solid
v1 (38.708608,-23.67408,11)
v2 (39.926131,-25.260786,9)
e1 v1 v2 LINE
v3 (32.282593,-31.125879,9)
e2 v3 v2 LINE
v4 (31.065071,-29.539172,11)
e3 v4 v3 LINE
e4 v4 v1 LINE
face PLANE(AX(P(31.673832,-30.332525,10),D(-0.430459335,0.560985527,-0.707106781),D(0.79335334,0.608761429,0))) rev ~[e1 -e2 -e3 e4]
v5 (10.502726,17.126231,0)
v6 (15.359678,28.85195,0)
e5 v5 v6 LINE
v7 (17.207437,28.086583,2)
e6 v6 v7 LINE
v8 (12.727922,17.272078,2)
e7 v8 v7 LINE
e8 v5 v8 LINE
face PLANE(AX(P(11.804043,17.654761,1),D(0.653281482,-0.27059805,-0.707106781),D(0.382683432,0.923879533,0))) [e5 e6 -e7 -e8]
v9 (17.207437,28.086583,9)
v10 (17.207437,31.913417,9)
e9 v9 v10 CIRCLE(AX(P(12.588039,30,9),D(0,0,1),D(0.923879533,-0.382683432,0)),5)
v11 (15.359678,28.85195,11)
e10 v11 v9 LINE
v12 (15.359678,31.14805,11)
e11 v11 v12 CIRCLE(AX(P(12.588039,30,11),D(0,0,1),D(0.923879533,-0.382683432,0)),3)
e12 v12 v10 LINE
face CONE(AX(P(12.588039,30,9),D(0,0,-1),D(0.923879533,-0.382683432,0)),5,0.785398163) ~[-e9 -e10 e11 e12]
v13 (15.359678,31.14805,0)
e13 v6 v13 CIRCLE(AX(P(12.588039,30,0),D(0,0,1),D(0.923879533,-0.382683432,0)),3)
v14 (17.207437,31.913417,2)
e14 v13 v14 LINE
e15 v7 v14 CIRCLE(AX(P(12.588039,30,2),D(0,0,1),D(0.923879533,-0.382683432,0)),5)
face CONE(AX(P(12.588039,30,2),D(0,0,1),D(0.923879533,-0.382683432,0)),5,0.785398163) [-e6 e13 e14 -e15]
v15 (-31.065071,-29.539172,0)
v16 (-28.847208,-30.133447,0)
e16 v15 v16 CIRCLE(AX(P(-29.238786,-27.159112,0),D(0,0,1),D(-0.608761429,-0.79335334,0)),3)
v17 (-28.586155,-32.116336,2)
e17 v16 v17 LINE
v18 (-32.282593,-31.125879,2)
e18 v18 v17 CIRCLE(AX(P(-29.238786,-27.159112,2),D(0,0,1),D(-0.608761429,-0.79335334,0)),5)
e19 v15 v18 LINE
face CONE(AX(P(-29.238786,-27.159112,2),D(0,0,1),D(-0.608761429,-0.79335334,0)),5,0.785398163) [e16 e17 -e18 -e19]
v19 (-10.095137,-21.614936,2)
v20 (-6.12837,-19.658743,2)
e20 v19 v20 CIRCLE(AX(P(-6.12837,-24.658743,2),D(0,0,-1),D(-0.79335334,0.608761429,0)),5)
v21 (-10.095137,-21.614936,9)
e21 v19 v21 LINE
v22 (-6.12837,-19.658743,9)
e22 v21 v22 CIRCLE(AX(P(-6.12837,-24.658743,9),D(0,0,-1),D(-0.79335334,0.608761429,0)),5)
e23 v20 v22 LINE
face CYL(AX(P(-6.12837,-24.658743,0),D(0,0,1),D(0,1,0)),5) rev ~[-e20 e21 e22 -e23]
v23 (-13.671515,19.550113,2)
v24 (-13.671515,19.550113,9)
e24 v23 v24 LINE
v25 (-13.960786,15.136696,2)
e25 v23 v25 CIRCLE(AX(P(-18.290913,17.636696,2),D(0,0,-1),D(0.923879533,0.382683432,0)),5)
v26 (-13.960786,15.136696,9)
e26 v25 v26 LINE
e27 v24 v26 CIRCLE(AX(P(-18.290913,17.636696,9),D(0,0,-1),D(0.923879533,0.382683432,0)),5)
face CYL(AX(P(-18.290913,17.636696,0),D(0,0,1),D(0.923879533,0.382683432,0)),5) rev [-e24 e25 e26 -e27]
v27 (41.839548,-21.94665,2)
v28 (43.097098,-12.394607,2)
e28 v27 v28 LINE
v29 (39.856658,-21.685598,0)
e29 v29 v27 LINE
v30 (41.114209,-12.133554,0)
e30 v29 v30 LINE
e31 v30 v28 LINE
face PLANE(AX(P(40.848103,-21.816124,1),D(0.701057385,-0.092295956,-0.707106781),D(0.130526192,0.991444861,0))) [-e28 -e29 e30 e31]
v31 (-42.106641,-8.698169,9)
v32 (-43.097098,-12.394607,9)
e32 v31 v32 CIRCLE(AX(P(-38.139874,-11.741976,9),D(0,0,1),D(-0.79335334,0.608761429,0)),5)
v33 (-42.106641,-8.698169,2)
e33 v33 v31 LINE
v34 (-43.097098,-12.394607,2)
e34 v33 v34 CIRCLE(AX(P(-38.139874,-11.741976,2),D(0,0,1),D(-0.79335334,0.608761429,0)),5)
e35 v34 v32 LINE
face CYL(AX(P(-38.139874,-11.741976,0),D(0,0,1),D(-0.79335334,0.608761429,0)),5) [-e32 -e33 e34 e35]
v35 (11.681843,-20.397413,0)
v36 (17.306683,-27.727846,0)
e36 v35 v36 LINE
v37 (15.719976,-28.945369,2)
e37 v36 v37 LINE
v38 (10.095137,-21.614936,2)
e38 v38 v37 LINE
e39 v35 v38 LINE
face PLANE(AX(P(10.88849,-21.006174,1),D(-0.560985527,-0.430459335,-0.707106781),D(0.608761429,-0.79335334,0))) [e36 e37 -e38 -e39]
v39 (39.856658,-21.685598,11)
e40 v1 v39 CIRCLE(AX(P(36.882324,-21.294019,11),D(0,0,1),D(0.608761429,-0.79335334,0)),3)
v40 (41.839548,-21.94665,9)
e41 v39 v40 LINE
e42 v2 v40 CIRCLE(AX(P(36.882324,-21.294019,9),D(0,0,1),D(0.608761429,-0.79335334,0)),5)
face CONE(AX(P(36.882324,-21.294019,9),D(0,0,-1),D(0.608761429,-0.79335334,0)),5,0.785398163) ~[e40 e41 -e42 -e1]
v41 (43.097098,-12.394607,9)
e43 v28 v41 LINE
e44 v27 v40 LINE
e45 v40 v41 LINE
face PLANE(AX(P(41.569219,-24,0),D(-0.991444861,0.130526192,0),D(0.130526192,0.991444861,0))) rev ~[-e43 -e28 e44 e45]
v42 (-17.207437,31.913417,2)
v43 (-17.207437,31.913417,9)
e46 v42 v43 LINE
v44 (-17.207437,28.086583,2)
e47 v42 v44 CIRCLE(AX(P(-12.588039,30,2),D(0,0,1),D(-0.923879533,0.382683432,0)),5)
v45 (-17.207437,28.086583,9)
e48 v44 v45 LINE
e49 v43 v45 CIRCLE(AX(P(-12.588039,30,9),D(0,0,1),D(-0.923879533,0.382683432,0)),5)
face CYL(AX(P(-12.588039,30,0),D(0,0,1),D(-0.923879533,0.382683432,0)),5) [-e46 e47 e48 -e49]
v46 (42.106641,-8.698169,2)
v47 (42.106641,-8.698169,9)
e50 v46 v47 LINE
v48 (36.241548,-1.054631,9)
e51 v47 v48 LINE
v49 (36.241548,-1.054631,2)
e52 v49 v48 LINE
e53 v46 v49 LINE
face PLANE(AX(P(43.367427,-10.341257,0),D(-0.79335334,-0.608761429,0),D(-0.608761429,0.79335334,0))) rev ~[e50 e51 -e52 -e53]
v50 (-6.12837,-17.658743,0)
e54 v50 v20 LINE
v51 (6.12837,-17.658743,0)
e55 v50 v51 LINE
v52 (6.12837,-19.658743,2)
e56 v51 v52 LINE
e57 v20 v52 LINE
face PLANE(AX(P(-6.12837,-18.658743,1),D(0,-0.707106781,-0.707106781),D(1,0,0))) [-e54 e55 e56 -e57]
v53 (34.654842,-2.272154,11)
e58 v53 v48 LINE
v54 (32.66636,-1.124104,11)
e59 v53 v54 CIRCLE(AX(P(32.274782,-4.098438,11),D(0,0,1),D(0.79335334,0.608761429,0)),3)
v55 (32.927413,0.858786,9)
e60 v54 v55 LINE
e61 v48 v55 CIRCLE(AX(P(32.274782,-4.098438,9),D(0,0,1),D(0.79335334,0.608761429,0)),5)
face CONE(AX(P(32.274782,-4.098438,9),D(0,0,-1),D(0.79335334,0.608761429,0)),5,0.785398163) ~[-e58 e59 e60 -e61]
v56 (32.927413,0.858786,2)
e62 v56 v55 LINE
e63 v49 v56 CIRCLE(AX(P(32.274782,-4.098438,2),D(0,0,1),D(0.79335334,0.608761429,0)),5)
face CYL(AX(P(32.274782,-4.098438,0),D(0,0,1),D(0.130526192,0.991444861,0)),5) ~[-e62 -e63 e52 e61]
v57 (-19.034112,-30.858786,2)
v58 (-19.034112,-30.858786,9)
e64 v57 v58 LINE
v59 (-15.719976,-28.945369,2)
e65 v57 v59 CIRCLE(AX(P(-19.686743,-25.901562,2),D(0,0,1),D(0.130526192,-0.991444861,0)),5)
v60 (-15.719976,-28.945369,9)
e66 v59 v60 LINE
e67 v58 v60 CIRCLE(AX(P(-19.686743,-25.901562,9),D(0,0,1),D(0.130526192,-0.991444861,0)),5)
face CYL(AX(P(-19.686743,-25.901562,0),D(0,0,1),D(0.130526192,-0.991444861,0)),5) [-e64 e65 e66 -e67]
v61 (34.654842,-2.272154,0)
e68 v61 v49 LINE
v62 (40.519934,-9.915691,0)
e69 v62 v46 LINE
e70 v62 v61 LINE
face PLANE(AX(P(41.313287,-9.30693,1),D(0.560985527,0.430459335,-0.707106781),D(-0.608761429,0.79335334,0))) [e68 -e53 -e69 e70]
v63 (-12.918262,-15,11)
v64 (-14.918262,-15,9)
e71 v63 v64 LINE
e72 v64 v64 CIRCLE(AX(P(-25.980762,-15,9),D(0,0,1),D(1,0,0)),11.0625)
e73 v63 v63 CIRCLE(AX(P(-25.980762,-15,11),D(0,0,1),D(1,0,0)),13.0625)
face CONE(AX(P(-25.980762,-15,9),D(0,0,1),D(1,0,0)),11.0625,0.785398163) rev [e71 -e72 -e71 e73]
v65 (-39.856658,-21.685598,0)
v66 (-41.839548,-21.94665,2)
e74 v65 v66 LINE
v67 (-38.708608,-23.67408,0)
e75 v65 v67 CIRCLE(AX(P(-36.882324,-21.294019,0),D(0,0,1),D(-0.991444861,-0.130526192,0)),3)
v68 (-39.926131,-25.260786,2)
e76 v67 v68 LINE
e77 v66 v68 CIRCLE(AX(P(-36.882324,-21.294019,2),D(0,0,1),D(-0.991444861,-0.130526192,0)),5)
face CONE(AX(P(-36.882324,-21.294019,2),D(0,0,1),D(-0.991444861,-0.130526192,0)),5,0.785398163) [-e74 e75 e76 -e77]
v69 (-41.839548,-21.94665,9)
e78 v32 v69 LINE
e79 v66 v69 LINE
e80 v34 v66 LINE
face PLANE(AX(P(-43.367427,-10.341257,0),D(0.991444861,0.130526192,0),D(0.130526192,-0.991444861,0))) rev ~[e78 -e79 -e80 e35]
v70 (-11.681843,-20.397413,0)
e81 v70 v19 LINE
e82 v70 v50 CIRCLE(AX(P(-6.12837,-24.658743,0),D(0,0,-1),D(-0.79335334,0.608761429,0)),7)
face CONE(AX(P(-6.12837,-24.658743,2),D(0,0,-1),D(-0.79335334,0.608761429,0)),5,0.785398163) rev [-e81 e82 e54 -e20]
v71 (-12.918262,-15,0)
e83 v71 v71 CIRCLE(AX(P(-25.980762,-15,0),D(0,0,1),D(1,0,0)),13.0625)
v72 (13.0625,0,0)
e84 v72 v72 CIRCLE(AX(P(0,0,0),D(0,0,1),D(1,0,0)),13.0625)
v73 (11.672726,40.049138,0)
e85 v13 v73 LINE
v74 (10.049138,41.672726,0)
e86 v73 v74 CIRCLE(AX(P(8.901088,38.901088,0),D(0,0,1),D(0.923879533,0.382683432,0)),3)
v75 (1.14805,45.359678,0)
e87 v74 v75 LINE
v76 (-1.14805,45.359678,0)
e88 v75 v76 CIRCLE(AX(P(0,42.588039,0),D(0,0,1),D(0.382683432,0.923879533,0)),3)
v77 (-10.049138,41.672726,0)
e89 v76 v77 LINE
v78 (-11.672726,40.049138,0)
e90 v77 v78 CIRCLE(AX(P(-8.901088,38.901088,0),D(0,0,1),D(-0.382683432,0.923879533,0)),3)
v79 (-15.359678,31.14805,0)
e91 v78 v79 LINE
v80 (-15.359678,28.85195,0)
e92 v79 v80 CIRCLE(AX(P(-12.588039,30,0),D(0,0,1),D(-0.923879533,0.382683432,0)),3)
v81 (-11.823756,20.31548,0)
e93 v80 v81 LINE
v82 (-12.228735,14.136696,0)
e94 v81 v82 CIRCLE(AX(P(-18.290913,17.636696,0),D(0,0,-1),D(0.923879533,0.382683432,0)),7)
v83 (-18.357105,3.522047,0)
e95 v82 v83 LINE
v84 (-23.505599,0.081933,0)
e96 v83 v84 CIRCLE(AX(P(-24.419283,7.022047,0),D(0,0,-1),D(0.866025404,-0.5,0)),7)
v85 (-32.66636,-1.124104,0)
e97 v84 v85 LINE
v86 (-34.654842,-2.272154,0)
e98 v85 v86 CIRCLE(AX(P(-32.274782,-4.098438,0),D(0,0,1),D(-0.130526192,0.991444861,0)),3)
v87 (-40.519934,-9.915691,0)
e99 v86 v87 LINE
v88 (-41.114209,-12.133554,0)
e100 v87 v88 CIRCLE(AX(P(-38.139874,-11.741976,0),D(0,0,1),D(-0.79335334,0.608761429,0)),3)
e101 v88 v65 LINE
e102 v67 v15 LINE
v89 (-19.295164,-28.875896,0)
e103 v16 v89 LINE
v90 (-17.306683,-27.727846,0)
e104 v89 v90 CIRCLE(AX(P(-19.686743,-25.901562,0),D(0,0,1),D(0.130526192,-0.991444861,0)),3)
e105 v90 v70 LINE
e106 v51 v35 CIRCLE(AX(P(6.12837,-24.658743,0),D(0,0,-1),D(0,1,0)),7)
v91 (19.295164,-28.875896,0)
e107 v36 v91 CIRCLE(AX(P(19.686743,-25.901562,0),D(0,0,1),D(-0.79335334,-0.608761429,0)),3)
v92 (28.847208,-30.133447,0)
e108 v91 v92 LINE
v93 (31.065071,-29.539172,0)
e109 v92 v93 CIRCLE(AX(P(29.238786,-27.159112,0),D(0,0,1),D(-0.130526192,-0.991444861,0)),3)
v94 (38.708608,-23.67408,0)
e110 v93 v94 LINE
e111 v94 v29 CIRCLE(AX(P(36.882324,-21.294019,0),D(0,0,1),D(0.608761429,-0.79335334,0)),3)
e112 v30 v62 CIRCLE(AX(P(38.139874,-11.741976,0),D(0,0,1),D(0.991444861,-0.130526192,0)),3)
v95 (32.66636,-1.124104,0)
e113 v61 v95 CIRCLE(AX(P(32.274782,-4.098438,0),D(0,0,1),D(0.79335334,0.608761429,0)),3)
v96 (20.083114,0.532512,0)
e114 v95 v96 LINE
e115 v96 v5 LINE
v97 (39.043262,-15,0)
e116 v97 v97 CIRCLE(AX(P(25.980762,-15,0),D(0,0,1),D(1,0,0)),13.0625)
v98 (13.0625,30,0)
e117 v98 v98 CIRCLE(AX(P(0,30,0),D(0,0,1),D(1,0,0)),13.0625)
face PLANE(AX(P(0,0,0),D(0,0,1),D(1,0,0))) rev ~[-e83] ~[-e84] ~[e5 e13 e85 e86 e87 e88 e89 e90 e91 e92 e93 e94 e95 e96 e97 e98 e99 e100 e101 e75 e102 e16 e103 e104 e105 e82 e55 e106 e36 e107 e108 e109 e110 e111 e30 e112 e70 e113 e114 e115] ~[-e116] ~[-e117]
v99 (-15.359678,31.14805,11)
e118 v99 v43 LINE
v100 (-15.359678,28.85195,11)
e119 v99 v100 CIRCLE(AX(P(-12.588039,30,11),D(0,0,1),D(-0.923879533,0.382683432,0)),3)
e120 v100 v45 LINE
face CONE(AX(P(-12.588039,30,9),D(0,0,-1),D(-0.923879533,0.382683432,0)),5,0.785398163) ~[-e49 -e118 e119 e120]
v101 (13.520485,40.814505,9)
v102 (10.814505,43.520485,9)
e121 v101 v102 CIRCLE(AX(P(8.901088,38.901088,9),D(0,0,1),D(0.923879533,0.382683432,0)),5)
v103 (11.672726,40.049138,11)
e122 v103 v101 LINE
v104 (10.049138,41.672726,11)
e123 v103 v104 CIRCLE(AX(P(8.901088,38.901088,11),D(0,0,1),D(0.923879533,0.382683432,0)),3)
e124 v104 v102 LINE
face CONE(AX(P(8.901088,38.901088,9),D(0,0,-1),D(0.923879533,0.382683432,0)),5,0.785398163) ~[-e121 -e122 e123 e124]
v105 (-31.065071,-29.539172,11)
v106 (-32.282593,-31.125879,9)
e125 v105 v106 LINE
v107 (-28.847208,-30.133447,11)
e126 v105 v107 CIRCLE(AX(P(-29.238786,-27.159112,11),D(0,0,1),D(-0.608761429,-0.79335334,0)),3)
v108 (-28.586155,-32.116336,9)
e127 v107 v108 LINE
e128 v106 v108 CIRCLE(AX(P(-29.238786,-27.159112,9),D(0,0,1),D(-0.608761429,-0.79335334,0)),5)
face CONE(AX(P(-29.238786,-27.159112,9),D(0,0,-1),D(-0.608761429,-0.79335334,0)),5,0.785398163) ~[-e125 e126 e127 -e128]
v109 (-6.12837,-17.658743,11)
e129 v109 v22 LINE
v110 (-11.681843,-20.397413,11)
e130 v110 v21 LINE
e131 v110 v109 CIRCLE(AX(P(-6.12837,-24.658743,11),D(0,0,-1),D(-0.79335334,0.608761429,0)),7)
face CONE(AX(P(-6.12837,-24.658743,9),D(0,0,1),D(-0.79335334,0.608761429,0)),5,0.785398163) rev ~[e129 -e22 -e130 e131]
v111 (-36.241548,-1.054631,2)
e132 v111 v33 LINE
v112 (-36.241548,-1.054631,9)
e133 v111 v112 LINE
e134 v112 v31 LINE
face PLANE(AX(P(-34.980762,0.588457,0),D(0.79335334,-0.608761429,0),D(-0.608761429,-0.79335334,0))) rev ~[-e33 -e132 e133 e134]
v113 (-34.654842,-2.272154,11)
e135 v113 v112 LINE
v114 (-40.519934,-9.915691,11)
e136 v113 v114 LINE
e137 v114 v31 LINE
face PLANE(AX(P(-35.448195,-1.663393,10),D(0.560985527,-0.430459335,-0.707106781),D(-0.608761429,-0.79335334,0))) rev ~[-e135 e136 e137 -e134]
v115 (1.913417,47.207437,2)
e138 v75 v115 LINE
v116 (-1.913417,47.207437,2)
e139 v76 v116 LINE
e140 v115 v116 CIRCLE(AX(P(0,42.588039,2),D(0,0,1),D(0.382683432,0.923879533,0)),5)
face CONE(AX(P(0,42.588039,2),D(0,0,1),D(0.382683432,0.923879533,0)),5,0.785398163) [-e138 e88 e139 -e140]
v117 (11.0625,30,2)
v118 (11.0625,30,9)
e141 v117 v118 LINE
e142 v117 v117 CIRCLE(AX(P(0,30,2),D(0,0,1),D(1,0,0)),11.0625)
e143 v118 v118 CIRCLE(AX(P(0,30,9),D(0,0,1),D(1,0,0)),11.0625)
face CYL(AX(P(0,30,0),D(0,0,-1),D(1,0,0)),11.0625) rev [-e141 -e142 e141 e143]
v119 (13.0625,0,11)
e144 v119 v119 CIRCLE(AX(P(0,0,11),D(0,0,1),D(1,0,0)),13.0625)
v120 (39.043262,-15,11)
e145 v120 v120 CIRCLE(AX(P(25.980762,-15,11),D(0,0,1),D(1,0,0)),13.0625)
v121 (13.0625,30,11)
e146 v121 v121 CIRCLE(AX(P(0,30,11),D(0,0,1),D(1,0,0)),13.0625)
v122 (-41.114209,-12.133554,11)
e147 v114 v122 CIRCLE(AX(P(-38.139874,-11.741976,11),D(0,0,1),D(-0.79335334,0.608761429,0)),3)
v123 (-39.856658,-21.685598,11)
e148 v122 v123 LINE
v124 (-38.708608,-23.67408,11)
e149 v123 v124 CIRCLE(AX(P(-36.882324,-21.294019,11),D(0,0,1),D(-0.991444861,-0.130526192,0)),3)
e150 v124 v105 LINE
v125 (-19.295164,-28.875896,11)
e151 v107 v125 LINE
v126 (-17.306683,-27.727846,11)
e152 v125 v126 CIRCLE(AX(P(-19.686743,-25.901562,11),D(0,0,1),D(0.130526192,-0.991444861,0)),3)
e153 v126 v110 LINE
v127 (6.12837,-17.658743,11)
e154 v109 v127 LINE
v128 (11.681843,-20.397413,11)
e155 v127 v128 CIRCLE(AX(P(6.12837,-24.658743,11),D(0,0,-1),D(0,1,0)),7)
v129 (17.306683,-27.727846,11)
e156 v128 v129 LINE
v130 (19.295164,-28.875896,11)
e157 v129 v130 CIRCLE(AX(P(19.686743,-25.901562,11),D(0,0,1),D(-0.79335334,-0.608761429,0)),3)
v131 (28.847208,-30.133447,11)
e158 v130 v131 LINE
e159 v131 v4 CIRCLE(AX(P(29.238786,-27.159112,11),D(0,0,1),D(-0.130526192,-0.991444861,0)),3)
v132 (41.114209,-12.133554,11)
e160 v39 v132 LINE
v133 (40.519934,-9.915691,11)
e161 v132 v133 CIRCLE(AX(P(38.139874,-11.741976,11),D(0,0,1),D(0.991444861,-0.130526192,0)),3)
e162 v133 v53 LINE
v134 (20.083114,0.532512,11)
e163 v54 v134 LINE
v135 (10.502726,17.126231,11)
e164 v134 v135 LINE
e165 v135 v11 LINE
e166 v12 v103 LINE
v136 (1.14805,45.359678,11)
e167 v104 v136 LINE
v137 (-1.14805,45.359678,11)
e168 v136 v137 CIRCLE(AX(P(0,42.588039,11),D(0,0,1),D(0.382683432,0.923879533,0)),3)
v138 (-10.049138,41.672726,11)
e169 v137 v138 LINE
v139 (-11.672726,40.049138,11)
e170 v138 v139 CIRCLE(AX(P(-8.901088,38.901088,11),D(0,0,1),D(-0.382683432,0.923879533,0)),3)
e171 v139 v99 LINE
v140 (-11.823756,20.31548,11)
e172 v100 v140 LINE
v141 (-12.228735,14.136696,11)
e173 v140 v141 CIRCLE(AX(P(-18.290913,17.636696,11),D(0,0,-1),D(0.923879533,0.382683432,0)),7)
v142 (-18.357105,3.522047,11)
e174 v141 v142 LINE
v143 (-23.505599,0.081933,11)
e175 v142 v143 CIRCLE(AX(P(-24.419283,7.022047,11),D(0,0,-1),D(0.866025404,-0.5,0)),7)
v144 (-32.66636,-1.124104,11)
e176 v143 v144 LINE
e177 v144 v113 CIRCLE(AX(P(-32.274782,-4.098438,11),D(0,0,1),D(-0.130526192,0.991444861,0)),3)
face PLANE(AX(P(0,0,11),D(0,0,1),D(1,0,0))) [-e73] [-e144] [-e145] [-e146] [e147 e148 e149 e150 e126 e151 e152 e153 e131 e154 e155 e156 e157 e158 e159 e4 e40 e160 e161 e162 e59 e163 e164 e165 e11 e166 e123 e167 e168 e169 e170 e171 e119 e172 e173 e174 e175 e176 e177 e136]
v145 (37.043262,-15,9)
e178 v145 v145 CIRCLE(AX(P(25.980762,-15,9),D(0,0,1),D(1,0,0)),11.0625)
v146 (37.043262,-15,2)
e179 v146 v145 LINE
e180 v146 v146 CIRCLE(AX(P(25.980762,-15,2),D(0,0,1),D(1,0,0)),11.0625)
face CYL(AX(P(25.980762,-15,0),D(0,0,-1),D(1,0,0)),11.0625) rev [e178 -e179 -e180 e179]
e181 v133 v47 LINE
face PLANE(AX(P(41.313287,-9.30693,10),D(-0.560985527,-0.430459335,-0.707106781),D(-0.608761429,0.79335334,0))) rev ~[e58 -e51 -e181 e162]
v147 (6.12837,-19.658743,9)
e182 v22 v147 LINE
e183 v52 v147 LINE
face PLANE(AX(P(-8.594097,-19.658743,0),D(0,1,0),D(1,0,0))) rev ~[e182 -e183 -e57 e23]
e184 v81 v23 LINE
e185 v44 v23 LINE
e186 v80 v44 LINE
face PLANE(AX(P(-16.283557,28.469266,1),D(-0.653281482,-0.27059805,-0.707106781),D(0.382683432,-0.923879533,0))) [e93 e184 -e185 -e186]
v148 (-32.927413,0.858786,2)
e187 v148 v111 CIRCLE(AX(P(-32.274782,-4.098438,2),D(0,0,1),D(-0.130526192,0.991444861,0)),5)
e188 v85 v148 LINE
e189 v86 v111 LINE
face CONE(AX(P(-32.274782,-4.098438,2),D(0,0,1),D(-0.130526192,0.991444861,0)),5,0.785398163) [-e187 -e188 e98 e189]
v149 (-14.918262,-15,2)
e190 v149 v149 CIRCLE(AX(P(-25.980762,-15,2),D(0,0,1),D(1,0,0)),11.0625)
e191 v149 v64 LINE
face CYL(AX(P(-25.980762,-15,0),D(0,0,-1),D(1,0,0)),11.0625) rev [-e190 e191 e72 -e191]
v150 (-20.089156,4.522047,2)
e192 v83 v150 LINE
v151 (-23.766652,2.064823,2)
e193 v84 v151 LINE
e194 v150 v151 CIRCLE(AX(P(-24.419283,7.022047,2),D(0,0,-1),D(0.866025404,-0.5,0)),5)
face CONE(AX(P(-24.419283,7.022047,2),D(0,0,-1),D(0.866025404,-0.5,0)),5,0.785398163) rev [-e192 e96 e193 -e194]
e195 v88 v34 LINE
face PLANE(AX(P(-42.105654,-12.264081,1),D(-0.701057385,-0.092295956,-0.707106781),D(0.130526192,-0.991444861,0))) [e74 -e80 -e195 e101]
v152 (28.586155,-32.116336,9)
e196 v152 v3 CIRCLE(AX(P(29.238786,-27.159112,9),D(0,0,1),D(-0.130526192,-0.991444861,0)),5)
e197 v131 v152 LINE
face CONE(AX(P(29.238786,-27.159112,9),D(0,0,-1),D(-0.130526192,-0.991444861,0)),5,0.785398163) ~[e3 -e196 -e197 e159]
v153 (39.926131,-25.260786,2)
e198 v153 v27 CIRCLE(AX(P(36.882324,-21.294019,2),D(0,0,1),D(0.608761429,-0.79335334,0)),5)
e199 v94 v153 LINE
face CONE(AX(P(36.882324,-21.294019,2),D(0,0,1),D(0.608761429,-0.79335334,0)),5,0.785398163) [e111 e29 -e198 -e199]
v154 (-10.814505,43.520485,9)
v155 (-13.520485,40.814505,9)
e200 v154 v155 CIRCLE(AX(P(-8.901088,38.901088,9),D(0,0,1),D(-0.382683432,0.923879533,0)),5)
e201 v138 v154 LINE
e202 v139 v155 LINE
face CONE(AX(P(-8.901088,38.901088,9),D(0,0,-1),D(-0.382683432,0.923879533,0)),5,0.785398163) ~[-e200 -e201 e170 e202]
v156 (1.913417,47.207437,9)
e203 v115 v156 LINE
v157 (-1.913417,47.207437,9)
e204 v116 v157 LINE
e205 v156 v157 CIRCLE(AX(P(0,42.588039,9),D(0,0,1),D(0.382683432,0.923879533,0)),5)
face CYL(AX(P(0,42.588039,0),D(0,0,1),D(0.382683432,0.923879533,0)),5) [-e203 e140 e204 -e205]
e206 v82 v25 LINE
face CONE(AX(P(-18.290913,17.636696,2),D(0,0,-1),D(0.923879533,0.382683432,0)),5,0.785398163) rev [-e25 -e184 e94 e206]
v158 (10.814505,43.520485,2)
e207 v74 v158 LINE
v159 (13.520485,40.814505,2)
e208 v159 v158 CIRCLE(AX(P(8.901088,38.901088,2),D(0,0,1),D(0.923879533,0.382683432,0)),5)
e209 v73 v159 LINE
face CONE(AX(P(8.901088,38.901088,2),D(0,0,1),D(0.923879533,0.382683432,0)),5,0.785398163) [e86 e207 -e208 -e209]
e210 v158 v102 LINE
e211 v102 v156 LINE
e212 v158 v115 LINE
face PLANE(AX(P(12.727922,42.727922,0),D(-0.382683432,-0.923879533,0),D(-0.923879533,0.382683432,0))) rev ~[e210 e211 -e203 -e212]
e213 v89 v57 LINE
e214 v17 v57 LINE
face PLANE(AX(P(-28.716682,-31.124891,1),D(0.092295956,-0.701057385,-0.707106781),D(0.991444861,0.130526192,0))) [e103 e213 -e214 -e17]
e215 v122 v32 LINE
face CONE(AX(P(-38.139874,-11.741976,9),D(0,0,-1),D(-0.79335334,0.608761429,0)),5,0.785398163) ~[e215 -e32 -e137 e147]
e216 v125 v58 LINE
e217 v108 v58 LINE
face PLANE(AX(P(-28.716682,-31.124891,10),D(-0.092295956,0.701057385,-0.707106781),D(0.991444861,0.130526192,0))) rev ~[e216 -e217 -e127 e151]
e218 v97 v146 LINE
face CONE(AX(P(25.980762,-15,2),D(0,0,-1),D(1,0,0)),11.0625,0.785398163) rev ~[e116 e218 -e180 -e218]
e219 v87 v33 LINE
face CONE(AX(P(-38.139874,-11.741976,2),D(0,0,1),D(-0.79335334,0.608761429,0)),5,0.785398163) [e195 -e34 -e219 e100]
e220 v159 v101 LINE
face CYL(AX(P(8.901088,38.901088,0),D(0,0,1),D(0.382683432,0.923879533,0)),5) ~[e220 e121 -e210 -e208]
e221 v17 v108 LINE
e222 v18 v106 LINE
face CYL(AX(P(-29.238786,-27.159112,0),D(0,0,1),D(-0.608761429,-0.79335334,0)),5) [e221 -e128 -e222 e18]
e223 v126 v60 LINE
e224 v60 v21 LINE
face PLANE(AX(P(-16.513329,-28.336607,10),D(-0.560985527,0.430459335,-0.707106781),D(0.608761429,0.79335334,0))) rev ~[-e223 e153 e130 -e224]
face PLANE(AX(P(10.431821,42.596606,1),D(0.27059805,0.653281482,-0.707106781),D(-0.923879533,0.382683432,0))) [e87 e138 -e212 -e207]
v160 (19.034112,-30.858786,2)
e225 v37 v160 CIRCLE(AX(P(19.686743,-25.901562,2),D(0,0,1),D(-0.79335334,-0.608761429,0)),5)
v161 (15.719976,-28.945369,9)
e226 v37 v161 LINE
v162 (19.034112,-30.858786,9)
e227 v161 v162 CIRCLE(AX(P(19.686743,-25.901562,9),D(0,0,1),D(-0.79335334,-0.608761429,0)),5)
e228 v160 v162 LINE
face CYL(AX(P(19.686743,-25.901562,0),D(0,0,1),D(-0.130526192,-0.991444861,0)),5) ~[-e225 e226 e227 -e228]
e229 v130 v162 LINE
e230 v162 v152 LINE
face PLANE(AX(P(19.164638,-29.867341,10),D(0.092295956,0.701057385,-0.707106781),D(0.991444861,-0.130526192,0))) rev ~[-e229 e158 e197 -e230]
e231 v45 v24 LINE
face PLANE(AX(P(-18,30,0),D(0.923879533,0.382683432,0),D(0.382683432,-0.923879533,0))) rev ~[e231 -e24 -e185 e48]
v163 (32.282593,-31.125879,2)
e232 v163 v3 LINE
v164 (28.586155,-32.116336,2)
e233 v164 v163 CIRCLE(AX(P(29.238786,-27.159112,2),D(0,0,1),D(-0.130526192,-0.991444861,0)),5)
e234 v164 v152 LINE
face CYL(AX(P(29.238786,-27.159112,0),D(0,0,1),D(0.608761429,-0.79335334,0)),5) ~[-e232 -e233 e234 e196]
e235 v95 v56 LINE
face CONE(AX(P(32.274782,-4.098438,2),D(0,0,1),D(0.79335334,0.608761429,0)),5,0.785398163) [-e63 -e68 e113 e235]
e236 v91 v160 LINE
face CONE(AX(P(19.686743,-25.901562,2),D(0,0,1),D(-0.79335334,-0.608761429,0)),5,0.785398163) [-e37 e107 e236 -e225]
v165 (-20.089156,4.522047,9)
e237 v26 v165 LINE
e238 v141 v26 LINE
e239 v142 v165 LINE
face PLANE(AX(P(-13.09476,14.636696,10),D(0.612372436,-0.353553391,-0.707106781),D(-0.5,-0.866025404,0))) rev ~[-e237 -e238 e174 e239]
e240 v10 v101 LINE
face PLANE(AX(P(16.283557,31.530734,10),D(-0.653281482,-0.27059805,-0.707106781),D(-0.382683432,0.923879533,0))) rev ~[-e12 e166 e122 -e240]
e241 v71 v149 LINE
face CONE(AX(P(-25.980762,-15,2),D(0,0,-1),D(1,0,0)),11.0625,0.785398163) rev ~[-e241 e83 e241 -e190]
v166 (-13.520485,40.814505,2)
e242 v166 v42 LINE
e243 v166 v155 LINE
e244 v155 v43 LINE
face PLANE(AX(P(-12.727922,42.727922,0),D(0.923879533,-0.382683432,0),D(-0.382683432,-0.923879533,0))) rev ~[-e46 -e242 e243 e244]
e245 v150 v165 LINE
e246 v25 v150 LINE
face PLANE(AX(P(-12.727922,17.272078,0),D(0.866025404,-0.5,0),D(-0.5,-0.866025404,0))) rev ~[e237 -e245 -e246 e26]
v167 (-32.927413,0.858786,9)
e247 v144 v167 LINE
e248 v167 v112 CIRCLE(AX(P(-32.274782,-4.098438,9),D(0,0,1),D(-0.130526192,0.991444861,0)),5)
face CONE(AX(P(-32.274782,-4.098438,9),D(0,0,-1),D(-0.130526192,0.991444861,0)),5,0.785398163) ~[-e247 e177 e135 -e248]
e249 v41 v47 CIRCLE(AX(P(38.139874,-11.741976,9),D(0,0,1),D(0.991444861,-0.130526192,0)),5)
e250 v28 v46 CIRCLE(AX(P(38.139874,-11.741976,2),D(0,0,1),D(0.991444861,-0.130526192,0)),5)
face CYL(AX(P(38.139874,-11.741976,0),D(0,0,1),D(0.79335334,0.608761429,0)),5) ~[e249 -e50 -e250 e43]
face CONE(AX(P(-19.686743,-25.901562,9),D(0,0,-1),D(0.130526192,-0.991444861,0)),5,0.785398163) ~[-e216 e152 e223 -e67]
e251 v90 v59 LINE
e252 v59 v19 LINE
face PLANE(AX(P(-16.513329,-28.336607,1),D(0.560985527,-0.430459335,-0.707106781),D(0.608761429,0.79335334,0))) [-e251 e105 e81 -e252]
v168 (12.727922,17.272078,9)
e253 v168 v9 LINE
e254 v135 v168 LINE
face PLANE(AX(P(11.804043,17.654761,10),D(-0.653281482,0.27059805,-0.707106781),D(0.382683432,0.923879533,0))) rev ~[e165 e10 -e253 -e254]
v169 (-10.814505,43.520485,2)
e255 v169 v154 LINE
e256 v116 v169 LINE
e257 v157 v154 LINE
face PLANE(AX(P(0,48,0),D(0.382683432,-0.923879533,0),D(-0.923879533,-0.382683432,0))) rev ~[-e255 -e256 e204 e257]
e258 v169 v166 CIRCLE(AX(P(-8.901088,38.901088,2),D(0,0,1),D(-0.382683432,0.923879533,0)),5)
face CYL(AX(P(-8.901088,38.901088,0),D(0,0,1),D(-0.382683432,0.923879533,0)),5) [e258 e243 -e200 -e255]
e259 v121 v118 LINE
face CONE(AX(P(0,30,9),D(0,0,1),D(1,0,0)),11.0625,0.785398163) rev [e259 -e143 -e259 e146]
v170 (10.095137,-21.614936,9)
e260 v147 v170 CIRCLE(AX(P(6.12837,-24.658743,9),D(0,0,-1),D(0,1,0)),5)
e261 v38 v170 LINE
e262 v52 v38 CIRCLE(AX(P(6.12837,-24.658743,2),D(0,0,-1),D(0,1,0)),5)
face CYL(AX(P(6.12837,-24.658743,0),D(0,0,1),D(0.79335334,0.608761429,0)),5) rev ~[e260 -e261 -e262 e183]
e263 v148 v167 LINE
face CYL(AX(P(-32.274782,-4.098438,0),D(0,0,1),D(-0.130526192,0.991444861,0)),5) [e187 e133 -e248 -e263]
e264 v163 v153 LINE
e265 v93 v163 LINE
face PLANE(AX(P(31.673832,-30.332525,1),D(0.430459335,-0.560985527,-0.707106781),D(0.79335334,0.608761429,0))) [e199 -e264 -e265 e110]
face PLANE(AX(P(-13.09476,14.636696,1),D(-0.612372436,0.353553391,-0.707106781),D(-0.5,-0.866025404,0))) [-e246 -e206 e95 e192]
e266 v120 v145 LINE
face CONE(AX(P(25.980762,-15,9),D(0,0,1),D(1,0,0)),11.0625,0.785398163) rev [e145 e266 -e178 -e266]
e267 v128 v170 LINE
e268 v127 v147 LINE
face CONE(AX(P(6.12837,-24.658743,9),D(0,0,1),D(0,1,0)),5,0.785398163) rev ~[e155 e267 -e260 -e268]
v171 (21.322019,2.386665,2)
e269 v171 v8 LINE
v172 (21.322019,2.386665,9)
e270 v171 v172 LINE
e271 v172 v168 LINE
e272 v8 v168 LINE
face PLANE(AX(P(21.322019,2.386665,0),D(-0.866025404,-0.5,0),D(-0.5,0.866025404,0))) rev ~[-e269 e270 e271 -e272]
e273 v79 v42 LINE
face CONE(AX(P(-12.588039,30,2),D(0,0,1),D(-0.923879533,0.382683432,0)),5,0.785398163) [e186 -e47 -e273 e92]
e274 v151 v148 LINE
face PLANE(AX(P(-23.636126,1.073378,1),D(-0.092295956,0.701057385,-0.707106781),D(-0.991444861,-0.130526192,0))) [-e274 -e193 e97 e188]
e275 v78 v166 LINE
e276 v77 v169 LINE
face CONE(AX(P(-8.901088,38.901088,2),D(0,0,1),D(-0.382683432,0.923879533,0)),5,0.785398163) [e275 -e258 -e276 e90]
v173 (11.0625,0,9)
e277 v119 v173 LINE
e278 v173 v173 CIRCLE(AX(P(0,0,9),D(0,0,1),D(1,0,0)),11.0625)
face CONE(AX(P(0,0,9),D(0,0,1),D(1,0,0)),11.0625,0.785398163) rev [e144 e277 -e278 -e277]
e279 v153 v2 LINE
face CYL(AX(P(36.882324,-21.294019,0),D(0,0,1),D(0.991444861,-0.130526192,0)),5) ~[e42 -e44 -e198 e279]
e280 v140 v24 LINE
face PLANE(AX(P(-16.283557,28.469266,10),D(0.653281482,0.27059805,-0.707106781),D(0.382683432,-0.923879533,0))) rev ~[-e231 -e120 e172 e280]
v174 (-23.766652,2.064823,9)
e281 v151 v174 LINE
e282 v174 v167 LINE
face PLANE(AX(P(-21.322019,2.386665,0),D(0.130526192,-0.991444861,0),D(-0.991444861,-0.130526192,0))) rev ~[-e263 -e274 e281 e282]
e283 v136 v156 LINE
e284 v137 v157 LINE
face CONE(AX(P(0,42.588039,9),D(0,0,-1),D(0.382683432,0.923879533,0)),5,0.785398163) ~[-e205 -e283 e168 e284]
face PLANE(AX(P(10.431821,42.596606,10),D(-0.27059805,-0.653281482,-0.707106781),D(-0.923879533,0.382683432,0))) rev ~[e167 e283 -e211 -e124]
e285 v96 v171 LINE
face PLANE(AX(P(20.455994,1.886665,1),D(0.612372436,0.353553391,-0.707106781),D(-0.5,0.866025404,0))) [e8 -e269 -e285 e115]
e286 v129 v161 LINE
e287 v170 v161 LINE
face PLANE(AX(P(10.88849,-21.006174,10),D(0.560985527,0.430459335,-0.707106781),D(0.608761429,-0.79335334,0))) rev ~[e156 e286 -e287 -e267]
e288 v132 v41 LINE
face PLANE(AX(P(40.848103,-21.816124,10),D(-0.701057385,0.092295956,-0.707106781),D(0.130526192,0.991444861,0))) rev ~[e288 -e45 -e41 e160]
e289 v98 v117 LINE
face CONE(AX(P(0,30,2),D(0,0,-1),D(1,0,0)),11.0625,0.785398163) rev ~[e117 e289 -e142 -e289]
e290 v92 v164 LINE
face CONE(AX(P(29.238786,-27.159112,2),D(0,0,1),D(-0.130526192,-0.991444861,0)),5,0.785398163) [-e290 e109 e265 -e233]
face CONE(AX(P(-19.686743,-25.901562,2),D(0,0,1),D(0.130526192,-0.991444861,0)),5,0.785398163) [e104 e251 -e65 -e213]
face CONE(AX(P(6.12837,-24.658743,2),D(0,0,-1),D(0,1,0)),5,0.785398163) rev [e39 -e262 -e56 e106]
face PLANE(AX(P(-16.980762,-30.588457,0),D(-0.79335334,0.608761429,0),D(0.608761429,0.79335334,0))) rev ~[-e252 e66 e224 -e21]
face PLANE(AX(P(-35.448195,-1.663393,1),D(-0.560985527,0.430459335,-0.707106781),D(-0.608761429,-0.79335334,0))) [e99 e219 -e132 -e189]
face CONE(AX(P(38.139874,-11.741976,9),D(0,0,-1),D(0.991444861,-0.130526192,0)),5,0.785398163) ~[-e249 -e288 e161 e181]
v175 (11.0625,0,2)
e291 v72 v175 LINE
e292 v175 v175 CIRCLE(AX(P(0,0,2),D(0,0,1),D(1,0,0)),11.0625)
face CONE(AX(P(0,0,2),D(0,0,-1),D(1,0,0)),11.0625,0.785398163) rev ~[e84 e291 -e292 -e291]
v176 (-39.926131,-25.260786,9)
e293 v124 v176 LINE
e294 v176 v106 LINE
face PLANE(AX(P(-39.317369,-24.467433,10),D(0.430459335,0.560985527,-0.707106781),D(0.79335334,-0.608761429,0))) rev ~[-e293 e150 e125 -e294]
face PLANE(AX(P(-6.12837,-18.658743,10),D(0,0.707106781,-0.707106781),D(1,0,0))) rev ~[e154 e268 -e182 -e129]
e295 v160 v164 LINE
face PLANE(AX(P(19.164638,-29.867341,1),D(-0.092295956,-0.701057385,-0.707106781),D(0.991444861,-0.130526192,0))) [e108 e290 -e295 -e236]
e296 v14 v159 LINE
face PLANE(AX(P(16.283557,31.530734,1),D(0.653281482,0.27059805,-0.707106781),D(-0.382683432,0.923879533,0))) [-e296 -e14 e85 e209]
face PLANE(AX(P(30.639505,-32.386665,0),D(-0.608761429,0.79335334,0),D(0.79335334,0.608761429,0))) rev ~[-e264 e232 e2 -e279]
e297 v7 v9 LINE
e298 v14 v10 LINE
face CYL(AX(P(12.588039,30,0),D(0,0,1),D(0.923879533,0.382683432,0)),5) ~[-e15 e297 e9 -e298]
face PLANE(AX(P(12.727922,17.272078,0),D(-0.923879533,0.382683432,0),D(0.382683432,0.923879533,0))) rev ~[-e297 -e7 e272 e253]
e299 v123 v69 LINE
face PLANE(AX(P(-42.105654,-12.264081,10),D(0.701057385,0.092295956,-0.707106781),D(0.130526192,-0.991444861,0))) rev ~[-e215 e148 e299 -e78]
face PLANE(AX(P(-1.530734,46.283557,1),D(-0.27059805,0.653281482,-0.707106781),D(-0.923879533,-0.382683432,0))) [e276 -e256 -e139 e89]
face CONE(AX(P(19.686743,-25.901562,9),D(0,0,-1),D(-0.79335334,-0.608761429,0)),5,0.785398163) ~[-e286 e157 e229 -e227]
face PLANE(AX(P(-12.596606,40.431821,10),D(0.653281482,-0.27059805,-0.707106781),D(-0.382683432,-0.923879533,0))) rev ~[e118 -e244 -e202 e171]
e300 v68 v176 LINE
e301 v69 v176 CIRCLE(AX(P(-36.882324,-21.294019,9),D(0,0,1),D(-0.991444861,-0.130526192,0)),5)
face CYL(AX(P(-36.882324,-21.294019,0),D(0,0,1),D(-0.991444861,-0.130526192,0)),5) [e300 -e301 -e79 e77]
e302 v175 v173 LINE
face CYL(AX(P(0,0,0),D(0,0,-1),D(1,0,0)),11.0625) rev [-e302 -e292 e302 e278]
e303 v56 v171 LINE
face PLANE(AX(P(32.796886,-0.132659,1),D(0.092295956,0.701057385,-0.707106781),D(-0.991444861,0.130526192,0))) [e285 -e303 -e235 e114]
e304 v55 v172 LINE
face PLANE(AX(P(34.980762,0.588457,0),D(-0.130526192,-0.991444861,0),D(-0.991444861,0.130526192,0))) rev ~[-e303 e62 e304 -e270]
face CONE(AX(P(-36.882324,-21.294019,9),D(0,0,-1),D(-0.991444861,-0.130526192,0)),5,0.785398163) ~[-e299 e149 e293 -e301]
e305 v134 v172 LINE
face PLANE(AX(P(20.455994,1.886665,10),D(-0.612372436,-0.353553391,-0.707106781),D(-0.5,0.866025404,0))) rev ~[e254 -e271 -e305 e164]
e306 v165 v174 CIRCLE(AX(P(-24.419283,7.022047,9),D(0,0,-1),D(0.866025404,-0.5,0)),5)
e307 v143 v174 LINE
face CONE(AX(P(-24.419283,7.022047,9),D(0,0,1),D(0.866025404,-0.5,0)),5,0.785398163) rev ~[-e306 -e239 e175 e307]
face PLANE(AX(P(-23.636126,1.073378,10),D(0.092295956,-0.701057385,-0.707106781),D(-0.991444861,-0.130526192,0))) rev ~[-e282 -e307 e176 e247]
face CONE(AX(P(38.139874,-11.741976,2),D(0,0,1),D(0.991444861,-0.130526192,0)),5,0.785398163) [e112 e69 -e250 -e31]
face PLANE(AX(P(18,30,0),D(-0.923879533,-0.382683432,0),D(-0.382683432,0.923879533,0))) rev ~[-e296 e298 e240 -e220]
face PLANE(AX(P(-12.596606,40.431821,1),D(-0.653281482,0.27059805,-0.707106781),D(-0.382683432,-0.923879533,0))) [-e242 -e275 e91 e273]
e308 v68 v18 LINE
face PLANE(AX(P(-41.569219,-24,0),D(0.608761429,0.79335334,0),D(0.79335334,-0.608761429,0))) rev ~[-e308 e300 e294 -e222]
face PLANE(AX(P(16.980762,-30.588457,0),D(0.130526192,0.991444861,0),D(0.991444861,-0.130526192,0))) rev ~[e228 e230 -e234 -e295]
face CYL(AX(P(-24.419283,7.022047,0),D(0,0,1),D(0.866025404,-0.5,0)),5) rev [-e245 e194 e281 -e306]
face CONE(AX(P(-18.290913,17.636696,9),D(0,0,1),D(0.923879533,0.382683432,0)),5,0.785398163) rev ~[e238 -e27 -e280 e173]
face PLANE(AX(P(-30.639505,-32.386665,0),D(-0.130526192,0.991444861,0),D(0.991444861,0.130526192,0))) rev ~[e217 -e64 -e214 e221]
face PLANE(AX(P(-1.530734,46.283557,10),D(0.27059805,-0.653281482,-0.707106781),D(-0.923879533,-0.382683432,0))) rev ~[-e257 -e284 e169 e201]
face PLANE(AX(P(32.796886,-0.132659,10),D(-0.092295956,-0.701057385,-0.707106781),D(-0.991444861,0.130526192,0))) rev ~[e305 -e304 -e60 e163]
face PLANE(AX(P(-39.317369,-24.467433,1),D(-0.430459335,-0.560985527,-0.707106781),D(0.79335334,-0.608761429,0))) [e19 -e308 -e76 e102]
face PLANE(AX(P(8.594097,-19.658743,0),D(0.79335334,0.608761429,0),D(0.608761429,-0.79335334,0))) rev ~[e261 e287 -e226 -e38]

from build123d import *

# Parameters (mm, degrees)
F0_R     = 11.0625
F1_DEPTH = 11
F2_R     = 5
F3_SIZE  = 2
F4_SIZE  = 2


# Not quite as in the source:
# - a feature names something its author has since deleted; it is built from what else it names


with BuildPart() as f1:
    # F0 (on Top) → F1 (new body)
    with BuildSketch(Plane.XY):
        Polygon((12.7279220614, 42.7279220614), (0, 48), (-12.7279220614, 42.7279220614), (-18, 30), (-12.7279220614, 17.2720779386), (-21.3220193017, 2.3866648732), (-34.9807621135, 0.5884572681), (-43.3674269867, -10.3412571882), (-41.5692193817, -24), (-30.6395049254, -32.3866648732), (-16.9807621135, -30.5884572681), (-8.5940972403, -19.6587428118), (8.5940972403, -19.6587428118), (16.9807621135, -30.5884572681), (30.6395049254, -32.3866648732), (41.5692193817, -24), (43.3674269867, -10.3412571882), (34.9807621135, 0.5884572681), (21.3220193017, 2.3866648732), (12.7279220614, 17.2720779386), (18, 30), align=None)
        with Locations((-25.9807621135, -15)):
            Circle(F0_R, mode=Mode.SUBTRACT)
        Circle(F0_R, mode=Mode.SUBTRACT)
        with Locations((25.9807621135, -15)):
            Circle(F0_R, mode=Mode.SUBTRACT)
        with Locations((0, 30)):
            Circle(F0_R, mode=Mode.SUBTRACT)
    extrude(amount=F1_DEPTH)

    # F2
    f2_edges = [f1.edges().sort_by_distance(p)[0] for p in [
        (-16.980762, -30.588457, 5.5),
        (-30.639505, -32.386665, 5.5),
        (-41.569219, -24, 5.5),
        (-43.367427, -10.341257, 5.5),
        (-34.980762, 0.588457, 5.5),
        (-18, 30, 5.5),
        (-12.727922, 42.727922, 5.5),
        (0, 48, 5.5),
        (12.727922, 42.727922, 5.5),
        (34.980762, 0.588457, 5.5),
        (43.367427, -10.341257, 5.5),
        (41.569219, -24, 5.5),
        (30.639505, -32.386665, 5.5),
        (16.980762, -30.588457, 5.5),
        (8.594097, -19.658743, 5.5),
        (-8.594097, -19.658743, 5.5),
        (18, 30, 5.5),
        (-12.727922, 17.272078, 5.5),
        (-21.322019, 2.386665, 5.5),
    ]]
    fillet(f2_edges, radius=F2_R)

    # F3
    f3_edges = [f1.edges().sort_by_distance(p)[0] for p in [
        (27.124716, 1.622725, 11),
        (34.774782, 0.231689, 11),
        (17.024971, 9.829371, 11),
        (39.174095, -4.8764, 11),
        (14.967679, 22.67933, 11),
        (42.969503, -10.447881, 11),
        (17.588039, 30, 11),
        (42.468323, -17.170629, 11),
        (15.363961, 36.363961, 11),
        (41.212451, -23.794019, 11),
        (12.436622, 42.436622, 11),
        (36.104362, -28.193332, 11),
        (6.363961, 45.363961, 11),
        (30.532882, -31.988741, 11),
        (0, 47.588039, 11),
        (23.810134, -31.487561, 11),
        (-6.363961, 45.363961, 11),
        (17.186743, -30.231689, 11),
        (-12.436622, 42.436622, 11),
        (12.907556, -25.280152, 11),
        (-15.363961, 36.363961, 11),
        (8.339814, -20.174379, 11),
        (-17.588039, 30, 11),
        (0, -19.658743, 11),
        (-15.439476, 23.818348, 11),
        (-8.339814, -20.174379, 11),
        (-13.301618, 17.30968, 11),
        (-12.907556, -25.280152, 11),
        (-17.024971, 9.829371, 11),
        (-17.186743, -30.231689, 11),
        (-21.641432, 2.864699, 11),
        (-23.810134, -31.487561, 11),
        (-28.347032, 1.461804, 11),
        (-30.532882, -31.988741, 11),
        (-34.774782, 0.231689, 11),
        (-36.104362, -28.193332, 11),
        (-39.174095, -4.8764, 11),
        (-41.212451, -23.794019, 11),
        (-42.969503, -10.447881, 11),
        (-42.468323, -17.170629, 11),
        (-37.043262, -15, 11),
        (-11.0625, 0, 11),
        (14.918262, -15, 11),
        (-11.0625, 30, 11),
    ]]
    chamfer(f3_edges, length=F3_SIZE)

    # F4
    f4_edges = [f1.edges().sort_by_distance(p)[0] for p in [
        (27.124716, 1.622725, 0),
        (34.774782, 0.231689, 0),
        (17.024971, 9.829371, 0),
        (39.174095, -4.8764, 0),
        (14.967679, 22.67933, 0),
        (42.969503, -10.447881, 0),
        (17.588039, 30, 0),
        (42.468323, -17.170629, 0),
        (15.363961, 36.363961, 0),
        (41.212451, -23.794019, 0),
        (12.436622, 42.436622, 0),
        (36.104362, -28.193332, 0),
        (6.363961, 45.363961, 0),
        (30.532882, -31.988741, 0),
        (0, 47.588039, 0),
        (23.810134, -31.487561, 0),
        (-6.363961, 45.363961, 0),
        (17.186743, -30.231689, 0),
        (-12.436622, 42.436622, 0),
        (12.907556, -25.280152, 0),
        (-15.363961, 36.363961, 0),
        (8.339814, -20.174379, 0),
        (-17.588039, 30, 0),
        (0, -19.658743, 0),
        (-15.439476, 23.818348, 0),
        (-8.339814, -20.174379, 0),
        (-13.301618, 17.30968, 0),
        (-12.907556, -25.280152, 0),
        (-17.024971, 9.829371, 0),
        (-17.186743, -30.231689, 0),
        (-21.641432, 2.864699, 0),
        (-23.810134, -31.487561, 0),
        (-28.347032, 1.461804, 0),
        (-30.532882, -31.988741, 0),
        (-34.774782, 0.231689, 0),
        (-36.104362, -28.193332, 0),
        (-39.174095, -4.8764, 0),
        (-41.212451, -23.794019, 0),
        (-42.969503, -10.447881, 0),
        (-42.468323, -17.170629, 0),
        (-37.043262, -15, 0),
        (-11.0625, 0, 0),
        (14.918262, -15, 0),
        (-11.0625, 30, 0),
    ]]
    chamfer(f4_edges, length=F4_SIZE)


solid = f1.part
